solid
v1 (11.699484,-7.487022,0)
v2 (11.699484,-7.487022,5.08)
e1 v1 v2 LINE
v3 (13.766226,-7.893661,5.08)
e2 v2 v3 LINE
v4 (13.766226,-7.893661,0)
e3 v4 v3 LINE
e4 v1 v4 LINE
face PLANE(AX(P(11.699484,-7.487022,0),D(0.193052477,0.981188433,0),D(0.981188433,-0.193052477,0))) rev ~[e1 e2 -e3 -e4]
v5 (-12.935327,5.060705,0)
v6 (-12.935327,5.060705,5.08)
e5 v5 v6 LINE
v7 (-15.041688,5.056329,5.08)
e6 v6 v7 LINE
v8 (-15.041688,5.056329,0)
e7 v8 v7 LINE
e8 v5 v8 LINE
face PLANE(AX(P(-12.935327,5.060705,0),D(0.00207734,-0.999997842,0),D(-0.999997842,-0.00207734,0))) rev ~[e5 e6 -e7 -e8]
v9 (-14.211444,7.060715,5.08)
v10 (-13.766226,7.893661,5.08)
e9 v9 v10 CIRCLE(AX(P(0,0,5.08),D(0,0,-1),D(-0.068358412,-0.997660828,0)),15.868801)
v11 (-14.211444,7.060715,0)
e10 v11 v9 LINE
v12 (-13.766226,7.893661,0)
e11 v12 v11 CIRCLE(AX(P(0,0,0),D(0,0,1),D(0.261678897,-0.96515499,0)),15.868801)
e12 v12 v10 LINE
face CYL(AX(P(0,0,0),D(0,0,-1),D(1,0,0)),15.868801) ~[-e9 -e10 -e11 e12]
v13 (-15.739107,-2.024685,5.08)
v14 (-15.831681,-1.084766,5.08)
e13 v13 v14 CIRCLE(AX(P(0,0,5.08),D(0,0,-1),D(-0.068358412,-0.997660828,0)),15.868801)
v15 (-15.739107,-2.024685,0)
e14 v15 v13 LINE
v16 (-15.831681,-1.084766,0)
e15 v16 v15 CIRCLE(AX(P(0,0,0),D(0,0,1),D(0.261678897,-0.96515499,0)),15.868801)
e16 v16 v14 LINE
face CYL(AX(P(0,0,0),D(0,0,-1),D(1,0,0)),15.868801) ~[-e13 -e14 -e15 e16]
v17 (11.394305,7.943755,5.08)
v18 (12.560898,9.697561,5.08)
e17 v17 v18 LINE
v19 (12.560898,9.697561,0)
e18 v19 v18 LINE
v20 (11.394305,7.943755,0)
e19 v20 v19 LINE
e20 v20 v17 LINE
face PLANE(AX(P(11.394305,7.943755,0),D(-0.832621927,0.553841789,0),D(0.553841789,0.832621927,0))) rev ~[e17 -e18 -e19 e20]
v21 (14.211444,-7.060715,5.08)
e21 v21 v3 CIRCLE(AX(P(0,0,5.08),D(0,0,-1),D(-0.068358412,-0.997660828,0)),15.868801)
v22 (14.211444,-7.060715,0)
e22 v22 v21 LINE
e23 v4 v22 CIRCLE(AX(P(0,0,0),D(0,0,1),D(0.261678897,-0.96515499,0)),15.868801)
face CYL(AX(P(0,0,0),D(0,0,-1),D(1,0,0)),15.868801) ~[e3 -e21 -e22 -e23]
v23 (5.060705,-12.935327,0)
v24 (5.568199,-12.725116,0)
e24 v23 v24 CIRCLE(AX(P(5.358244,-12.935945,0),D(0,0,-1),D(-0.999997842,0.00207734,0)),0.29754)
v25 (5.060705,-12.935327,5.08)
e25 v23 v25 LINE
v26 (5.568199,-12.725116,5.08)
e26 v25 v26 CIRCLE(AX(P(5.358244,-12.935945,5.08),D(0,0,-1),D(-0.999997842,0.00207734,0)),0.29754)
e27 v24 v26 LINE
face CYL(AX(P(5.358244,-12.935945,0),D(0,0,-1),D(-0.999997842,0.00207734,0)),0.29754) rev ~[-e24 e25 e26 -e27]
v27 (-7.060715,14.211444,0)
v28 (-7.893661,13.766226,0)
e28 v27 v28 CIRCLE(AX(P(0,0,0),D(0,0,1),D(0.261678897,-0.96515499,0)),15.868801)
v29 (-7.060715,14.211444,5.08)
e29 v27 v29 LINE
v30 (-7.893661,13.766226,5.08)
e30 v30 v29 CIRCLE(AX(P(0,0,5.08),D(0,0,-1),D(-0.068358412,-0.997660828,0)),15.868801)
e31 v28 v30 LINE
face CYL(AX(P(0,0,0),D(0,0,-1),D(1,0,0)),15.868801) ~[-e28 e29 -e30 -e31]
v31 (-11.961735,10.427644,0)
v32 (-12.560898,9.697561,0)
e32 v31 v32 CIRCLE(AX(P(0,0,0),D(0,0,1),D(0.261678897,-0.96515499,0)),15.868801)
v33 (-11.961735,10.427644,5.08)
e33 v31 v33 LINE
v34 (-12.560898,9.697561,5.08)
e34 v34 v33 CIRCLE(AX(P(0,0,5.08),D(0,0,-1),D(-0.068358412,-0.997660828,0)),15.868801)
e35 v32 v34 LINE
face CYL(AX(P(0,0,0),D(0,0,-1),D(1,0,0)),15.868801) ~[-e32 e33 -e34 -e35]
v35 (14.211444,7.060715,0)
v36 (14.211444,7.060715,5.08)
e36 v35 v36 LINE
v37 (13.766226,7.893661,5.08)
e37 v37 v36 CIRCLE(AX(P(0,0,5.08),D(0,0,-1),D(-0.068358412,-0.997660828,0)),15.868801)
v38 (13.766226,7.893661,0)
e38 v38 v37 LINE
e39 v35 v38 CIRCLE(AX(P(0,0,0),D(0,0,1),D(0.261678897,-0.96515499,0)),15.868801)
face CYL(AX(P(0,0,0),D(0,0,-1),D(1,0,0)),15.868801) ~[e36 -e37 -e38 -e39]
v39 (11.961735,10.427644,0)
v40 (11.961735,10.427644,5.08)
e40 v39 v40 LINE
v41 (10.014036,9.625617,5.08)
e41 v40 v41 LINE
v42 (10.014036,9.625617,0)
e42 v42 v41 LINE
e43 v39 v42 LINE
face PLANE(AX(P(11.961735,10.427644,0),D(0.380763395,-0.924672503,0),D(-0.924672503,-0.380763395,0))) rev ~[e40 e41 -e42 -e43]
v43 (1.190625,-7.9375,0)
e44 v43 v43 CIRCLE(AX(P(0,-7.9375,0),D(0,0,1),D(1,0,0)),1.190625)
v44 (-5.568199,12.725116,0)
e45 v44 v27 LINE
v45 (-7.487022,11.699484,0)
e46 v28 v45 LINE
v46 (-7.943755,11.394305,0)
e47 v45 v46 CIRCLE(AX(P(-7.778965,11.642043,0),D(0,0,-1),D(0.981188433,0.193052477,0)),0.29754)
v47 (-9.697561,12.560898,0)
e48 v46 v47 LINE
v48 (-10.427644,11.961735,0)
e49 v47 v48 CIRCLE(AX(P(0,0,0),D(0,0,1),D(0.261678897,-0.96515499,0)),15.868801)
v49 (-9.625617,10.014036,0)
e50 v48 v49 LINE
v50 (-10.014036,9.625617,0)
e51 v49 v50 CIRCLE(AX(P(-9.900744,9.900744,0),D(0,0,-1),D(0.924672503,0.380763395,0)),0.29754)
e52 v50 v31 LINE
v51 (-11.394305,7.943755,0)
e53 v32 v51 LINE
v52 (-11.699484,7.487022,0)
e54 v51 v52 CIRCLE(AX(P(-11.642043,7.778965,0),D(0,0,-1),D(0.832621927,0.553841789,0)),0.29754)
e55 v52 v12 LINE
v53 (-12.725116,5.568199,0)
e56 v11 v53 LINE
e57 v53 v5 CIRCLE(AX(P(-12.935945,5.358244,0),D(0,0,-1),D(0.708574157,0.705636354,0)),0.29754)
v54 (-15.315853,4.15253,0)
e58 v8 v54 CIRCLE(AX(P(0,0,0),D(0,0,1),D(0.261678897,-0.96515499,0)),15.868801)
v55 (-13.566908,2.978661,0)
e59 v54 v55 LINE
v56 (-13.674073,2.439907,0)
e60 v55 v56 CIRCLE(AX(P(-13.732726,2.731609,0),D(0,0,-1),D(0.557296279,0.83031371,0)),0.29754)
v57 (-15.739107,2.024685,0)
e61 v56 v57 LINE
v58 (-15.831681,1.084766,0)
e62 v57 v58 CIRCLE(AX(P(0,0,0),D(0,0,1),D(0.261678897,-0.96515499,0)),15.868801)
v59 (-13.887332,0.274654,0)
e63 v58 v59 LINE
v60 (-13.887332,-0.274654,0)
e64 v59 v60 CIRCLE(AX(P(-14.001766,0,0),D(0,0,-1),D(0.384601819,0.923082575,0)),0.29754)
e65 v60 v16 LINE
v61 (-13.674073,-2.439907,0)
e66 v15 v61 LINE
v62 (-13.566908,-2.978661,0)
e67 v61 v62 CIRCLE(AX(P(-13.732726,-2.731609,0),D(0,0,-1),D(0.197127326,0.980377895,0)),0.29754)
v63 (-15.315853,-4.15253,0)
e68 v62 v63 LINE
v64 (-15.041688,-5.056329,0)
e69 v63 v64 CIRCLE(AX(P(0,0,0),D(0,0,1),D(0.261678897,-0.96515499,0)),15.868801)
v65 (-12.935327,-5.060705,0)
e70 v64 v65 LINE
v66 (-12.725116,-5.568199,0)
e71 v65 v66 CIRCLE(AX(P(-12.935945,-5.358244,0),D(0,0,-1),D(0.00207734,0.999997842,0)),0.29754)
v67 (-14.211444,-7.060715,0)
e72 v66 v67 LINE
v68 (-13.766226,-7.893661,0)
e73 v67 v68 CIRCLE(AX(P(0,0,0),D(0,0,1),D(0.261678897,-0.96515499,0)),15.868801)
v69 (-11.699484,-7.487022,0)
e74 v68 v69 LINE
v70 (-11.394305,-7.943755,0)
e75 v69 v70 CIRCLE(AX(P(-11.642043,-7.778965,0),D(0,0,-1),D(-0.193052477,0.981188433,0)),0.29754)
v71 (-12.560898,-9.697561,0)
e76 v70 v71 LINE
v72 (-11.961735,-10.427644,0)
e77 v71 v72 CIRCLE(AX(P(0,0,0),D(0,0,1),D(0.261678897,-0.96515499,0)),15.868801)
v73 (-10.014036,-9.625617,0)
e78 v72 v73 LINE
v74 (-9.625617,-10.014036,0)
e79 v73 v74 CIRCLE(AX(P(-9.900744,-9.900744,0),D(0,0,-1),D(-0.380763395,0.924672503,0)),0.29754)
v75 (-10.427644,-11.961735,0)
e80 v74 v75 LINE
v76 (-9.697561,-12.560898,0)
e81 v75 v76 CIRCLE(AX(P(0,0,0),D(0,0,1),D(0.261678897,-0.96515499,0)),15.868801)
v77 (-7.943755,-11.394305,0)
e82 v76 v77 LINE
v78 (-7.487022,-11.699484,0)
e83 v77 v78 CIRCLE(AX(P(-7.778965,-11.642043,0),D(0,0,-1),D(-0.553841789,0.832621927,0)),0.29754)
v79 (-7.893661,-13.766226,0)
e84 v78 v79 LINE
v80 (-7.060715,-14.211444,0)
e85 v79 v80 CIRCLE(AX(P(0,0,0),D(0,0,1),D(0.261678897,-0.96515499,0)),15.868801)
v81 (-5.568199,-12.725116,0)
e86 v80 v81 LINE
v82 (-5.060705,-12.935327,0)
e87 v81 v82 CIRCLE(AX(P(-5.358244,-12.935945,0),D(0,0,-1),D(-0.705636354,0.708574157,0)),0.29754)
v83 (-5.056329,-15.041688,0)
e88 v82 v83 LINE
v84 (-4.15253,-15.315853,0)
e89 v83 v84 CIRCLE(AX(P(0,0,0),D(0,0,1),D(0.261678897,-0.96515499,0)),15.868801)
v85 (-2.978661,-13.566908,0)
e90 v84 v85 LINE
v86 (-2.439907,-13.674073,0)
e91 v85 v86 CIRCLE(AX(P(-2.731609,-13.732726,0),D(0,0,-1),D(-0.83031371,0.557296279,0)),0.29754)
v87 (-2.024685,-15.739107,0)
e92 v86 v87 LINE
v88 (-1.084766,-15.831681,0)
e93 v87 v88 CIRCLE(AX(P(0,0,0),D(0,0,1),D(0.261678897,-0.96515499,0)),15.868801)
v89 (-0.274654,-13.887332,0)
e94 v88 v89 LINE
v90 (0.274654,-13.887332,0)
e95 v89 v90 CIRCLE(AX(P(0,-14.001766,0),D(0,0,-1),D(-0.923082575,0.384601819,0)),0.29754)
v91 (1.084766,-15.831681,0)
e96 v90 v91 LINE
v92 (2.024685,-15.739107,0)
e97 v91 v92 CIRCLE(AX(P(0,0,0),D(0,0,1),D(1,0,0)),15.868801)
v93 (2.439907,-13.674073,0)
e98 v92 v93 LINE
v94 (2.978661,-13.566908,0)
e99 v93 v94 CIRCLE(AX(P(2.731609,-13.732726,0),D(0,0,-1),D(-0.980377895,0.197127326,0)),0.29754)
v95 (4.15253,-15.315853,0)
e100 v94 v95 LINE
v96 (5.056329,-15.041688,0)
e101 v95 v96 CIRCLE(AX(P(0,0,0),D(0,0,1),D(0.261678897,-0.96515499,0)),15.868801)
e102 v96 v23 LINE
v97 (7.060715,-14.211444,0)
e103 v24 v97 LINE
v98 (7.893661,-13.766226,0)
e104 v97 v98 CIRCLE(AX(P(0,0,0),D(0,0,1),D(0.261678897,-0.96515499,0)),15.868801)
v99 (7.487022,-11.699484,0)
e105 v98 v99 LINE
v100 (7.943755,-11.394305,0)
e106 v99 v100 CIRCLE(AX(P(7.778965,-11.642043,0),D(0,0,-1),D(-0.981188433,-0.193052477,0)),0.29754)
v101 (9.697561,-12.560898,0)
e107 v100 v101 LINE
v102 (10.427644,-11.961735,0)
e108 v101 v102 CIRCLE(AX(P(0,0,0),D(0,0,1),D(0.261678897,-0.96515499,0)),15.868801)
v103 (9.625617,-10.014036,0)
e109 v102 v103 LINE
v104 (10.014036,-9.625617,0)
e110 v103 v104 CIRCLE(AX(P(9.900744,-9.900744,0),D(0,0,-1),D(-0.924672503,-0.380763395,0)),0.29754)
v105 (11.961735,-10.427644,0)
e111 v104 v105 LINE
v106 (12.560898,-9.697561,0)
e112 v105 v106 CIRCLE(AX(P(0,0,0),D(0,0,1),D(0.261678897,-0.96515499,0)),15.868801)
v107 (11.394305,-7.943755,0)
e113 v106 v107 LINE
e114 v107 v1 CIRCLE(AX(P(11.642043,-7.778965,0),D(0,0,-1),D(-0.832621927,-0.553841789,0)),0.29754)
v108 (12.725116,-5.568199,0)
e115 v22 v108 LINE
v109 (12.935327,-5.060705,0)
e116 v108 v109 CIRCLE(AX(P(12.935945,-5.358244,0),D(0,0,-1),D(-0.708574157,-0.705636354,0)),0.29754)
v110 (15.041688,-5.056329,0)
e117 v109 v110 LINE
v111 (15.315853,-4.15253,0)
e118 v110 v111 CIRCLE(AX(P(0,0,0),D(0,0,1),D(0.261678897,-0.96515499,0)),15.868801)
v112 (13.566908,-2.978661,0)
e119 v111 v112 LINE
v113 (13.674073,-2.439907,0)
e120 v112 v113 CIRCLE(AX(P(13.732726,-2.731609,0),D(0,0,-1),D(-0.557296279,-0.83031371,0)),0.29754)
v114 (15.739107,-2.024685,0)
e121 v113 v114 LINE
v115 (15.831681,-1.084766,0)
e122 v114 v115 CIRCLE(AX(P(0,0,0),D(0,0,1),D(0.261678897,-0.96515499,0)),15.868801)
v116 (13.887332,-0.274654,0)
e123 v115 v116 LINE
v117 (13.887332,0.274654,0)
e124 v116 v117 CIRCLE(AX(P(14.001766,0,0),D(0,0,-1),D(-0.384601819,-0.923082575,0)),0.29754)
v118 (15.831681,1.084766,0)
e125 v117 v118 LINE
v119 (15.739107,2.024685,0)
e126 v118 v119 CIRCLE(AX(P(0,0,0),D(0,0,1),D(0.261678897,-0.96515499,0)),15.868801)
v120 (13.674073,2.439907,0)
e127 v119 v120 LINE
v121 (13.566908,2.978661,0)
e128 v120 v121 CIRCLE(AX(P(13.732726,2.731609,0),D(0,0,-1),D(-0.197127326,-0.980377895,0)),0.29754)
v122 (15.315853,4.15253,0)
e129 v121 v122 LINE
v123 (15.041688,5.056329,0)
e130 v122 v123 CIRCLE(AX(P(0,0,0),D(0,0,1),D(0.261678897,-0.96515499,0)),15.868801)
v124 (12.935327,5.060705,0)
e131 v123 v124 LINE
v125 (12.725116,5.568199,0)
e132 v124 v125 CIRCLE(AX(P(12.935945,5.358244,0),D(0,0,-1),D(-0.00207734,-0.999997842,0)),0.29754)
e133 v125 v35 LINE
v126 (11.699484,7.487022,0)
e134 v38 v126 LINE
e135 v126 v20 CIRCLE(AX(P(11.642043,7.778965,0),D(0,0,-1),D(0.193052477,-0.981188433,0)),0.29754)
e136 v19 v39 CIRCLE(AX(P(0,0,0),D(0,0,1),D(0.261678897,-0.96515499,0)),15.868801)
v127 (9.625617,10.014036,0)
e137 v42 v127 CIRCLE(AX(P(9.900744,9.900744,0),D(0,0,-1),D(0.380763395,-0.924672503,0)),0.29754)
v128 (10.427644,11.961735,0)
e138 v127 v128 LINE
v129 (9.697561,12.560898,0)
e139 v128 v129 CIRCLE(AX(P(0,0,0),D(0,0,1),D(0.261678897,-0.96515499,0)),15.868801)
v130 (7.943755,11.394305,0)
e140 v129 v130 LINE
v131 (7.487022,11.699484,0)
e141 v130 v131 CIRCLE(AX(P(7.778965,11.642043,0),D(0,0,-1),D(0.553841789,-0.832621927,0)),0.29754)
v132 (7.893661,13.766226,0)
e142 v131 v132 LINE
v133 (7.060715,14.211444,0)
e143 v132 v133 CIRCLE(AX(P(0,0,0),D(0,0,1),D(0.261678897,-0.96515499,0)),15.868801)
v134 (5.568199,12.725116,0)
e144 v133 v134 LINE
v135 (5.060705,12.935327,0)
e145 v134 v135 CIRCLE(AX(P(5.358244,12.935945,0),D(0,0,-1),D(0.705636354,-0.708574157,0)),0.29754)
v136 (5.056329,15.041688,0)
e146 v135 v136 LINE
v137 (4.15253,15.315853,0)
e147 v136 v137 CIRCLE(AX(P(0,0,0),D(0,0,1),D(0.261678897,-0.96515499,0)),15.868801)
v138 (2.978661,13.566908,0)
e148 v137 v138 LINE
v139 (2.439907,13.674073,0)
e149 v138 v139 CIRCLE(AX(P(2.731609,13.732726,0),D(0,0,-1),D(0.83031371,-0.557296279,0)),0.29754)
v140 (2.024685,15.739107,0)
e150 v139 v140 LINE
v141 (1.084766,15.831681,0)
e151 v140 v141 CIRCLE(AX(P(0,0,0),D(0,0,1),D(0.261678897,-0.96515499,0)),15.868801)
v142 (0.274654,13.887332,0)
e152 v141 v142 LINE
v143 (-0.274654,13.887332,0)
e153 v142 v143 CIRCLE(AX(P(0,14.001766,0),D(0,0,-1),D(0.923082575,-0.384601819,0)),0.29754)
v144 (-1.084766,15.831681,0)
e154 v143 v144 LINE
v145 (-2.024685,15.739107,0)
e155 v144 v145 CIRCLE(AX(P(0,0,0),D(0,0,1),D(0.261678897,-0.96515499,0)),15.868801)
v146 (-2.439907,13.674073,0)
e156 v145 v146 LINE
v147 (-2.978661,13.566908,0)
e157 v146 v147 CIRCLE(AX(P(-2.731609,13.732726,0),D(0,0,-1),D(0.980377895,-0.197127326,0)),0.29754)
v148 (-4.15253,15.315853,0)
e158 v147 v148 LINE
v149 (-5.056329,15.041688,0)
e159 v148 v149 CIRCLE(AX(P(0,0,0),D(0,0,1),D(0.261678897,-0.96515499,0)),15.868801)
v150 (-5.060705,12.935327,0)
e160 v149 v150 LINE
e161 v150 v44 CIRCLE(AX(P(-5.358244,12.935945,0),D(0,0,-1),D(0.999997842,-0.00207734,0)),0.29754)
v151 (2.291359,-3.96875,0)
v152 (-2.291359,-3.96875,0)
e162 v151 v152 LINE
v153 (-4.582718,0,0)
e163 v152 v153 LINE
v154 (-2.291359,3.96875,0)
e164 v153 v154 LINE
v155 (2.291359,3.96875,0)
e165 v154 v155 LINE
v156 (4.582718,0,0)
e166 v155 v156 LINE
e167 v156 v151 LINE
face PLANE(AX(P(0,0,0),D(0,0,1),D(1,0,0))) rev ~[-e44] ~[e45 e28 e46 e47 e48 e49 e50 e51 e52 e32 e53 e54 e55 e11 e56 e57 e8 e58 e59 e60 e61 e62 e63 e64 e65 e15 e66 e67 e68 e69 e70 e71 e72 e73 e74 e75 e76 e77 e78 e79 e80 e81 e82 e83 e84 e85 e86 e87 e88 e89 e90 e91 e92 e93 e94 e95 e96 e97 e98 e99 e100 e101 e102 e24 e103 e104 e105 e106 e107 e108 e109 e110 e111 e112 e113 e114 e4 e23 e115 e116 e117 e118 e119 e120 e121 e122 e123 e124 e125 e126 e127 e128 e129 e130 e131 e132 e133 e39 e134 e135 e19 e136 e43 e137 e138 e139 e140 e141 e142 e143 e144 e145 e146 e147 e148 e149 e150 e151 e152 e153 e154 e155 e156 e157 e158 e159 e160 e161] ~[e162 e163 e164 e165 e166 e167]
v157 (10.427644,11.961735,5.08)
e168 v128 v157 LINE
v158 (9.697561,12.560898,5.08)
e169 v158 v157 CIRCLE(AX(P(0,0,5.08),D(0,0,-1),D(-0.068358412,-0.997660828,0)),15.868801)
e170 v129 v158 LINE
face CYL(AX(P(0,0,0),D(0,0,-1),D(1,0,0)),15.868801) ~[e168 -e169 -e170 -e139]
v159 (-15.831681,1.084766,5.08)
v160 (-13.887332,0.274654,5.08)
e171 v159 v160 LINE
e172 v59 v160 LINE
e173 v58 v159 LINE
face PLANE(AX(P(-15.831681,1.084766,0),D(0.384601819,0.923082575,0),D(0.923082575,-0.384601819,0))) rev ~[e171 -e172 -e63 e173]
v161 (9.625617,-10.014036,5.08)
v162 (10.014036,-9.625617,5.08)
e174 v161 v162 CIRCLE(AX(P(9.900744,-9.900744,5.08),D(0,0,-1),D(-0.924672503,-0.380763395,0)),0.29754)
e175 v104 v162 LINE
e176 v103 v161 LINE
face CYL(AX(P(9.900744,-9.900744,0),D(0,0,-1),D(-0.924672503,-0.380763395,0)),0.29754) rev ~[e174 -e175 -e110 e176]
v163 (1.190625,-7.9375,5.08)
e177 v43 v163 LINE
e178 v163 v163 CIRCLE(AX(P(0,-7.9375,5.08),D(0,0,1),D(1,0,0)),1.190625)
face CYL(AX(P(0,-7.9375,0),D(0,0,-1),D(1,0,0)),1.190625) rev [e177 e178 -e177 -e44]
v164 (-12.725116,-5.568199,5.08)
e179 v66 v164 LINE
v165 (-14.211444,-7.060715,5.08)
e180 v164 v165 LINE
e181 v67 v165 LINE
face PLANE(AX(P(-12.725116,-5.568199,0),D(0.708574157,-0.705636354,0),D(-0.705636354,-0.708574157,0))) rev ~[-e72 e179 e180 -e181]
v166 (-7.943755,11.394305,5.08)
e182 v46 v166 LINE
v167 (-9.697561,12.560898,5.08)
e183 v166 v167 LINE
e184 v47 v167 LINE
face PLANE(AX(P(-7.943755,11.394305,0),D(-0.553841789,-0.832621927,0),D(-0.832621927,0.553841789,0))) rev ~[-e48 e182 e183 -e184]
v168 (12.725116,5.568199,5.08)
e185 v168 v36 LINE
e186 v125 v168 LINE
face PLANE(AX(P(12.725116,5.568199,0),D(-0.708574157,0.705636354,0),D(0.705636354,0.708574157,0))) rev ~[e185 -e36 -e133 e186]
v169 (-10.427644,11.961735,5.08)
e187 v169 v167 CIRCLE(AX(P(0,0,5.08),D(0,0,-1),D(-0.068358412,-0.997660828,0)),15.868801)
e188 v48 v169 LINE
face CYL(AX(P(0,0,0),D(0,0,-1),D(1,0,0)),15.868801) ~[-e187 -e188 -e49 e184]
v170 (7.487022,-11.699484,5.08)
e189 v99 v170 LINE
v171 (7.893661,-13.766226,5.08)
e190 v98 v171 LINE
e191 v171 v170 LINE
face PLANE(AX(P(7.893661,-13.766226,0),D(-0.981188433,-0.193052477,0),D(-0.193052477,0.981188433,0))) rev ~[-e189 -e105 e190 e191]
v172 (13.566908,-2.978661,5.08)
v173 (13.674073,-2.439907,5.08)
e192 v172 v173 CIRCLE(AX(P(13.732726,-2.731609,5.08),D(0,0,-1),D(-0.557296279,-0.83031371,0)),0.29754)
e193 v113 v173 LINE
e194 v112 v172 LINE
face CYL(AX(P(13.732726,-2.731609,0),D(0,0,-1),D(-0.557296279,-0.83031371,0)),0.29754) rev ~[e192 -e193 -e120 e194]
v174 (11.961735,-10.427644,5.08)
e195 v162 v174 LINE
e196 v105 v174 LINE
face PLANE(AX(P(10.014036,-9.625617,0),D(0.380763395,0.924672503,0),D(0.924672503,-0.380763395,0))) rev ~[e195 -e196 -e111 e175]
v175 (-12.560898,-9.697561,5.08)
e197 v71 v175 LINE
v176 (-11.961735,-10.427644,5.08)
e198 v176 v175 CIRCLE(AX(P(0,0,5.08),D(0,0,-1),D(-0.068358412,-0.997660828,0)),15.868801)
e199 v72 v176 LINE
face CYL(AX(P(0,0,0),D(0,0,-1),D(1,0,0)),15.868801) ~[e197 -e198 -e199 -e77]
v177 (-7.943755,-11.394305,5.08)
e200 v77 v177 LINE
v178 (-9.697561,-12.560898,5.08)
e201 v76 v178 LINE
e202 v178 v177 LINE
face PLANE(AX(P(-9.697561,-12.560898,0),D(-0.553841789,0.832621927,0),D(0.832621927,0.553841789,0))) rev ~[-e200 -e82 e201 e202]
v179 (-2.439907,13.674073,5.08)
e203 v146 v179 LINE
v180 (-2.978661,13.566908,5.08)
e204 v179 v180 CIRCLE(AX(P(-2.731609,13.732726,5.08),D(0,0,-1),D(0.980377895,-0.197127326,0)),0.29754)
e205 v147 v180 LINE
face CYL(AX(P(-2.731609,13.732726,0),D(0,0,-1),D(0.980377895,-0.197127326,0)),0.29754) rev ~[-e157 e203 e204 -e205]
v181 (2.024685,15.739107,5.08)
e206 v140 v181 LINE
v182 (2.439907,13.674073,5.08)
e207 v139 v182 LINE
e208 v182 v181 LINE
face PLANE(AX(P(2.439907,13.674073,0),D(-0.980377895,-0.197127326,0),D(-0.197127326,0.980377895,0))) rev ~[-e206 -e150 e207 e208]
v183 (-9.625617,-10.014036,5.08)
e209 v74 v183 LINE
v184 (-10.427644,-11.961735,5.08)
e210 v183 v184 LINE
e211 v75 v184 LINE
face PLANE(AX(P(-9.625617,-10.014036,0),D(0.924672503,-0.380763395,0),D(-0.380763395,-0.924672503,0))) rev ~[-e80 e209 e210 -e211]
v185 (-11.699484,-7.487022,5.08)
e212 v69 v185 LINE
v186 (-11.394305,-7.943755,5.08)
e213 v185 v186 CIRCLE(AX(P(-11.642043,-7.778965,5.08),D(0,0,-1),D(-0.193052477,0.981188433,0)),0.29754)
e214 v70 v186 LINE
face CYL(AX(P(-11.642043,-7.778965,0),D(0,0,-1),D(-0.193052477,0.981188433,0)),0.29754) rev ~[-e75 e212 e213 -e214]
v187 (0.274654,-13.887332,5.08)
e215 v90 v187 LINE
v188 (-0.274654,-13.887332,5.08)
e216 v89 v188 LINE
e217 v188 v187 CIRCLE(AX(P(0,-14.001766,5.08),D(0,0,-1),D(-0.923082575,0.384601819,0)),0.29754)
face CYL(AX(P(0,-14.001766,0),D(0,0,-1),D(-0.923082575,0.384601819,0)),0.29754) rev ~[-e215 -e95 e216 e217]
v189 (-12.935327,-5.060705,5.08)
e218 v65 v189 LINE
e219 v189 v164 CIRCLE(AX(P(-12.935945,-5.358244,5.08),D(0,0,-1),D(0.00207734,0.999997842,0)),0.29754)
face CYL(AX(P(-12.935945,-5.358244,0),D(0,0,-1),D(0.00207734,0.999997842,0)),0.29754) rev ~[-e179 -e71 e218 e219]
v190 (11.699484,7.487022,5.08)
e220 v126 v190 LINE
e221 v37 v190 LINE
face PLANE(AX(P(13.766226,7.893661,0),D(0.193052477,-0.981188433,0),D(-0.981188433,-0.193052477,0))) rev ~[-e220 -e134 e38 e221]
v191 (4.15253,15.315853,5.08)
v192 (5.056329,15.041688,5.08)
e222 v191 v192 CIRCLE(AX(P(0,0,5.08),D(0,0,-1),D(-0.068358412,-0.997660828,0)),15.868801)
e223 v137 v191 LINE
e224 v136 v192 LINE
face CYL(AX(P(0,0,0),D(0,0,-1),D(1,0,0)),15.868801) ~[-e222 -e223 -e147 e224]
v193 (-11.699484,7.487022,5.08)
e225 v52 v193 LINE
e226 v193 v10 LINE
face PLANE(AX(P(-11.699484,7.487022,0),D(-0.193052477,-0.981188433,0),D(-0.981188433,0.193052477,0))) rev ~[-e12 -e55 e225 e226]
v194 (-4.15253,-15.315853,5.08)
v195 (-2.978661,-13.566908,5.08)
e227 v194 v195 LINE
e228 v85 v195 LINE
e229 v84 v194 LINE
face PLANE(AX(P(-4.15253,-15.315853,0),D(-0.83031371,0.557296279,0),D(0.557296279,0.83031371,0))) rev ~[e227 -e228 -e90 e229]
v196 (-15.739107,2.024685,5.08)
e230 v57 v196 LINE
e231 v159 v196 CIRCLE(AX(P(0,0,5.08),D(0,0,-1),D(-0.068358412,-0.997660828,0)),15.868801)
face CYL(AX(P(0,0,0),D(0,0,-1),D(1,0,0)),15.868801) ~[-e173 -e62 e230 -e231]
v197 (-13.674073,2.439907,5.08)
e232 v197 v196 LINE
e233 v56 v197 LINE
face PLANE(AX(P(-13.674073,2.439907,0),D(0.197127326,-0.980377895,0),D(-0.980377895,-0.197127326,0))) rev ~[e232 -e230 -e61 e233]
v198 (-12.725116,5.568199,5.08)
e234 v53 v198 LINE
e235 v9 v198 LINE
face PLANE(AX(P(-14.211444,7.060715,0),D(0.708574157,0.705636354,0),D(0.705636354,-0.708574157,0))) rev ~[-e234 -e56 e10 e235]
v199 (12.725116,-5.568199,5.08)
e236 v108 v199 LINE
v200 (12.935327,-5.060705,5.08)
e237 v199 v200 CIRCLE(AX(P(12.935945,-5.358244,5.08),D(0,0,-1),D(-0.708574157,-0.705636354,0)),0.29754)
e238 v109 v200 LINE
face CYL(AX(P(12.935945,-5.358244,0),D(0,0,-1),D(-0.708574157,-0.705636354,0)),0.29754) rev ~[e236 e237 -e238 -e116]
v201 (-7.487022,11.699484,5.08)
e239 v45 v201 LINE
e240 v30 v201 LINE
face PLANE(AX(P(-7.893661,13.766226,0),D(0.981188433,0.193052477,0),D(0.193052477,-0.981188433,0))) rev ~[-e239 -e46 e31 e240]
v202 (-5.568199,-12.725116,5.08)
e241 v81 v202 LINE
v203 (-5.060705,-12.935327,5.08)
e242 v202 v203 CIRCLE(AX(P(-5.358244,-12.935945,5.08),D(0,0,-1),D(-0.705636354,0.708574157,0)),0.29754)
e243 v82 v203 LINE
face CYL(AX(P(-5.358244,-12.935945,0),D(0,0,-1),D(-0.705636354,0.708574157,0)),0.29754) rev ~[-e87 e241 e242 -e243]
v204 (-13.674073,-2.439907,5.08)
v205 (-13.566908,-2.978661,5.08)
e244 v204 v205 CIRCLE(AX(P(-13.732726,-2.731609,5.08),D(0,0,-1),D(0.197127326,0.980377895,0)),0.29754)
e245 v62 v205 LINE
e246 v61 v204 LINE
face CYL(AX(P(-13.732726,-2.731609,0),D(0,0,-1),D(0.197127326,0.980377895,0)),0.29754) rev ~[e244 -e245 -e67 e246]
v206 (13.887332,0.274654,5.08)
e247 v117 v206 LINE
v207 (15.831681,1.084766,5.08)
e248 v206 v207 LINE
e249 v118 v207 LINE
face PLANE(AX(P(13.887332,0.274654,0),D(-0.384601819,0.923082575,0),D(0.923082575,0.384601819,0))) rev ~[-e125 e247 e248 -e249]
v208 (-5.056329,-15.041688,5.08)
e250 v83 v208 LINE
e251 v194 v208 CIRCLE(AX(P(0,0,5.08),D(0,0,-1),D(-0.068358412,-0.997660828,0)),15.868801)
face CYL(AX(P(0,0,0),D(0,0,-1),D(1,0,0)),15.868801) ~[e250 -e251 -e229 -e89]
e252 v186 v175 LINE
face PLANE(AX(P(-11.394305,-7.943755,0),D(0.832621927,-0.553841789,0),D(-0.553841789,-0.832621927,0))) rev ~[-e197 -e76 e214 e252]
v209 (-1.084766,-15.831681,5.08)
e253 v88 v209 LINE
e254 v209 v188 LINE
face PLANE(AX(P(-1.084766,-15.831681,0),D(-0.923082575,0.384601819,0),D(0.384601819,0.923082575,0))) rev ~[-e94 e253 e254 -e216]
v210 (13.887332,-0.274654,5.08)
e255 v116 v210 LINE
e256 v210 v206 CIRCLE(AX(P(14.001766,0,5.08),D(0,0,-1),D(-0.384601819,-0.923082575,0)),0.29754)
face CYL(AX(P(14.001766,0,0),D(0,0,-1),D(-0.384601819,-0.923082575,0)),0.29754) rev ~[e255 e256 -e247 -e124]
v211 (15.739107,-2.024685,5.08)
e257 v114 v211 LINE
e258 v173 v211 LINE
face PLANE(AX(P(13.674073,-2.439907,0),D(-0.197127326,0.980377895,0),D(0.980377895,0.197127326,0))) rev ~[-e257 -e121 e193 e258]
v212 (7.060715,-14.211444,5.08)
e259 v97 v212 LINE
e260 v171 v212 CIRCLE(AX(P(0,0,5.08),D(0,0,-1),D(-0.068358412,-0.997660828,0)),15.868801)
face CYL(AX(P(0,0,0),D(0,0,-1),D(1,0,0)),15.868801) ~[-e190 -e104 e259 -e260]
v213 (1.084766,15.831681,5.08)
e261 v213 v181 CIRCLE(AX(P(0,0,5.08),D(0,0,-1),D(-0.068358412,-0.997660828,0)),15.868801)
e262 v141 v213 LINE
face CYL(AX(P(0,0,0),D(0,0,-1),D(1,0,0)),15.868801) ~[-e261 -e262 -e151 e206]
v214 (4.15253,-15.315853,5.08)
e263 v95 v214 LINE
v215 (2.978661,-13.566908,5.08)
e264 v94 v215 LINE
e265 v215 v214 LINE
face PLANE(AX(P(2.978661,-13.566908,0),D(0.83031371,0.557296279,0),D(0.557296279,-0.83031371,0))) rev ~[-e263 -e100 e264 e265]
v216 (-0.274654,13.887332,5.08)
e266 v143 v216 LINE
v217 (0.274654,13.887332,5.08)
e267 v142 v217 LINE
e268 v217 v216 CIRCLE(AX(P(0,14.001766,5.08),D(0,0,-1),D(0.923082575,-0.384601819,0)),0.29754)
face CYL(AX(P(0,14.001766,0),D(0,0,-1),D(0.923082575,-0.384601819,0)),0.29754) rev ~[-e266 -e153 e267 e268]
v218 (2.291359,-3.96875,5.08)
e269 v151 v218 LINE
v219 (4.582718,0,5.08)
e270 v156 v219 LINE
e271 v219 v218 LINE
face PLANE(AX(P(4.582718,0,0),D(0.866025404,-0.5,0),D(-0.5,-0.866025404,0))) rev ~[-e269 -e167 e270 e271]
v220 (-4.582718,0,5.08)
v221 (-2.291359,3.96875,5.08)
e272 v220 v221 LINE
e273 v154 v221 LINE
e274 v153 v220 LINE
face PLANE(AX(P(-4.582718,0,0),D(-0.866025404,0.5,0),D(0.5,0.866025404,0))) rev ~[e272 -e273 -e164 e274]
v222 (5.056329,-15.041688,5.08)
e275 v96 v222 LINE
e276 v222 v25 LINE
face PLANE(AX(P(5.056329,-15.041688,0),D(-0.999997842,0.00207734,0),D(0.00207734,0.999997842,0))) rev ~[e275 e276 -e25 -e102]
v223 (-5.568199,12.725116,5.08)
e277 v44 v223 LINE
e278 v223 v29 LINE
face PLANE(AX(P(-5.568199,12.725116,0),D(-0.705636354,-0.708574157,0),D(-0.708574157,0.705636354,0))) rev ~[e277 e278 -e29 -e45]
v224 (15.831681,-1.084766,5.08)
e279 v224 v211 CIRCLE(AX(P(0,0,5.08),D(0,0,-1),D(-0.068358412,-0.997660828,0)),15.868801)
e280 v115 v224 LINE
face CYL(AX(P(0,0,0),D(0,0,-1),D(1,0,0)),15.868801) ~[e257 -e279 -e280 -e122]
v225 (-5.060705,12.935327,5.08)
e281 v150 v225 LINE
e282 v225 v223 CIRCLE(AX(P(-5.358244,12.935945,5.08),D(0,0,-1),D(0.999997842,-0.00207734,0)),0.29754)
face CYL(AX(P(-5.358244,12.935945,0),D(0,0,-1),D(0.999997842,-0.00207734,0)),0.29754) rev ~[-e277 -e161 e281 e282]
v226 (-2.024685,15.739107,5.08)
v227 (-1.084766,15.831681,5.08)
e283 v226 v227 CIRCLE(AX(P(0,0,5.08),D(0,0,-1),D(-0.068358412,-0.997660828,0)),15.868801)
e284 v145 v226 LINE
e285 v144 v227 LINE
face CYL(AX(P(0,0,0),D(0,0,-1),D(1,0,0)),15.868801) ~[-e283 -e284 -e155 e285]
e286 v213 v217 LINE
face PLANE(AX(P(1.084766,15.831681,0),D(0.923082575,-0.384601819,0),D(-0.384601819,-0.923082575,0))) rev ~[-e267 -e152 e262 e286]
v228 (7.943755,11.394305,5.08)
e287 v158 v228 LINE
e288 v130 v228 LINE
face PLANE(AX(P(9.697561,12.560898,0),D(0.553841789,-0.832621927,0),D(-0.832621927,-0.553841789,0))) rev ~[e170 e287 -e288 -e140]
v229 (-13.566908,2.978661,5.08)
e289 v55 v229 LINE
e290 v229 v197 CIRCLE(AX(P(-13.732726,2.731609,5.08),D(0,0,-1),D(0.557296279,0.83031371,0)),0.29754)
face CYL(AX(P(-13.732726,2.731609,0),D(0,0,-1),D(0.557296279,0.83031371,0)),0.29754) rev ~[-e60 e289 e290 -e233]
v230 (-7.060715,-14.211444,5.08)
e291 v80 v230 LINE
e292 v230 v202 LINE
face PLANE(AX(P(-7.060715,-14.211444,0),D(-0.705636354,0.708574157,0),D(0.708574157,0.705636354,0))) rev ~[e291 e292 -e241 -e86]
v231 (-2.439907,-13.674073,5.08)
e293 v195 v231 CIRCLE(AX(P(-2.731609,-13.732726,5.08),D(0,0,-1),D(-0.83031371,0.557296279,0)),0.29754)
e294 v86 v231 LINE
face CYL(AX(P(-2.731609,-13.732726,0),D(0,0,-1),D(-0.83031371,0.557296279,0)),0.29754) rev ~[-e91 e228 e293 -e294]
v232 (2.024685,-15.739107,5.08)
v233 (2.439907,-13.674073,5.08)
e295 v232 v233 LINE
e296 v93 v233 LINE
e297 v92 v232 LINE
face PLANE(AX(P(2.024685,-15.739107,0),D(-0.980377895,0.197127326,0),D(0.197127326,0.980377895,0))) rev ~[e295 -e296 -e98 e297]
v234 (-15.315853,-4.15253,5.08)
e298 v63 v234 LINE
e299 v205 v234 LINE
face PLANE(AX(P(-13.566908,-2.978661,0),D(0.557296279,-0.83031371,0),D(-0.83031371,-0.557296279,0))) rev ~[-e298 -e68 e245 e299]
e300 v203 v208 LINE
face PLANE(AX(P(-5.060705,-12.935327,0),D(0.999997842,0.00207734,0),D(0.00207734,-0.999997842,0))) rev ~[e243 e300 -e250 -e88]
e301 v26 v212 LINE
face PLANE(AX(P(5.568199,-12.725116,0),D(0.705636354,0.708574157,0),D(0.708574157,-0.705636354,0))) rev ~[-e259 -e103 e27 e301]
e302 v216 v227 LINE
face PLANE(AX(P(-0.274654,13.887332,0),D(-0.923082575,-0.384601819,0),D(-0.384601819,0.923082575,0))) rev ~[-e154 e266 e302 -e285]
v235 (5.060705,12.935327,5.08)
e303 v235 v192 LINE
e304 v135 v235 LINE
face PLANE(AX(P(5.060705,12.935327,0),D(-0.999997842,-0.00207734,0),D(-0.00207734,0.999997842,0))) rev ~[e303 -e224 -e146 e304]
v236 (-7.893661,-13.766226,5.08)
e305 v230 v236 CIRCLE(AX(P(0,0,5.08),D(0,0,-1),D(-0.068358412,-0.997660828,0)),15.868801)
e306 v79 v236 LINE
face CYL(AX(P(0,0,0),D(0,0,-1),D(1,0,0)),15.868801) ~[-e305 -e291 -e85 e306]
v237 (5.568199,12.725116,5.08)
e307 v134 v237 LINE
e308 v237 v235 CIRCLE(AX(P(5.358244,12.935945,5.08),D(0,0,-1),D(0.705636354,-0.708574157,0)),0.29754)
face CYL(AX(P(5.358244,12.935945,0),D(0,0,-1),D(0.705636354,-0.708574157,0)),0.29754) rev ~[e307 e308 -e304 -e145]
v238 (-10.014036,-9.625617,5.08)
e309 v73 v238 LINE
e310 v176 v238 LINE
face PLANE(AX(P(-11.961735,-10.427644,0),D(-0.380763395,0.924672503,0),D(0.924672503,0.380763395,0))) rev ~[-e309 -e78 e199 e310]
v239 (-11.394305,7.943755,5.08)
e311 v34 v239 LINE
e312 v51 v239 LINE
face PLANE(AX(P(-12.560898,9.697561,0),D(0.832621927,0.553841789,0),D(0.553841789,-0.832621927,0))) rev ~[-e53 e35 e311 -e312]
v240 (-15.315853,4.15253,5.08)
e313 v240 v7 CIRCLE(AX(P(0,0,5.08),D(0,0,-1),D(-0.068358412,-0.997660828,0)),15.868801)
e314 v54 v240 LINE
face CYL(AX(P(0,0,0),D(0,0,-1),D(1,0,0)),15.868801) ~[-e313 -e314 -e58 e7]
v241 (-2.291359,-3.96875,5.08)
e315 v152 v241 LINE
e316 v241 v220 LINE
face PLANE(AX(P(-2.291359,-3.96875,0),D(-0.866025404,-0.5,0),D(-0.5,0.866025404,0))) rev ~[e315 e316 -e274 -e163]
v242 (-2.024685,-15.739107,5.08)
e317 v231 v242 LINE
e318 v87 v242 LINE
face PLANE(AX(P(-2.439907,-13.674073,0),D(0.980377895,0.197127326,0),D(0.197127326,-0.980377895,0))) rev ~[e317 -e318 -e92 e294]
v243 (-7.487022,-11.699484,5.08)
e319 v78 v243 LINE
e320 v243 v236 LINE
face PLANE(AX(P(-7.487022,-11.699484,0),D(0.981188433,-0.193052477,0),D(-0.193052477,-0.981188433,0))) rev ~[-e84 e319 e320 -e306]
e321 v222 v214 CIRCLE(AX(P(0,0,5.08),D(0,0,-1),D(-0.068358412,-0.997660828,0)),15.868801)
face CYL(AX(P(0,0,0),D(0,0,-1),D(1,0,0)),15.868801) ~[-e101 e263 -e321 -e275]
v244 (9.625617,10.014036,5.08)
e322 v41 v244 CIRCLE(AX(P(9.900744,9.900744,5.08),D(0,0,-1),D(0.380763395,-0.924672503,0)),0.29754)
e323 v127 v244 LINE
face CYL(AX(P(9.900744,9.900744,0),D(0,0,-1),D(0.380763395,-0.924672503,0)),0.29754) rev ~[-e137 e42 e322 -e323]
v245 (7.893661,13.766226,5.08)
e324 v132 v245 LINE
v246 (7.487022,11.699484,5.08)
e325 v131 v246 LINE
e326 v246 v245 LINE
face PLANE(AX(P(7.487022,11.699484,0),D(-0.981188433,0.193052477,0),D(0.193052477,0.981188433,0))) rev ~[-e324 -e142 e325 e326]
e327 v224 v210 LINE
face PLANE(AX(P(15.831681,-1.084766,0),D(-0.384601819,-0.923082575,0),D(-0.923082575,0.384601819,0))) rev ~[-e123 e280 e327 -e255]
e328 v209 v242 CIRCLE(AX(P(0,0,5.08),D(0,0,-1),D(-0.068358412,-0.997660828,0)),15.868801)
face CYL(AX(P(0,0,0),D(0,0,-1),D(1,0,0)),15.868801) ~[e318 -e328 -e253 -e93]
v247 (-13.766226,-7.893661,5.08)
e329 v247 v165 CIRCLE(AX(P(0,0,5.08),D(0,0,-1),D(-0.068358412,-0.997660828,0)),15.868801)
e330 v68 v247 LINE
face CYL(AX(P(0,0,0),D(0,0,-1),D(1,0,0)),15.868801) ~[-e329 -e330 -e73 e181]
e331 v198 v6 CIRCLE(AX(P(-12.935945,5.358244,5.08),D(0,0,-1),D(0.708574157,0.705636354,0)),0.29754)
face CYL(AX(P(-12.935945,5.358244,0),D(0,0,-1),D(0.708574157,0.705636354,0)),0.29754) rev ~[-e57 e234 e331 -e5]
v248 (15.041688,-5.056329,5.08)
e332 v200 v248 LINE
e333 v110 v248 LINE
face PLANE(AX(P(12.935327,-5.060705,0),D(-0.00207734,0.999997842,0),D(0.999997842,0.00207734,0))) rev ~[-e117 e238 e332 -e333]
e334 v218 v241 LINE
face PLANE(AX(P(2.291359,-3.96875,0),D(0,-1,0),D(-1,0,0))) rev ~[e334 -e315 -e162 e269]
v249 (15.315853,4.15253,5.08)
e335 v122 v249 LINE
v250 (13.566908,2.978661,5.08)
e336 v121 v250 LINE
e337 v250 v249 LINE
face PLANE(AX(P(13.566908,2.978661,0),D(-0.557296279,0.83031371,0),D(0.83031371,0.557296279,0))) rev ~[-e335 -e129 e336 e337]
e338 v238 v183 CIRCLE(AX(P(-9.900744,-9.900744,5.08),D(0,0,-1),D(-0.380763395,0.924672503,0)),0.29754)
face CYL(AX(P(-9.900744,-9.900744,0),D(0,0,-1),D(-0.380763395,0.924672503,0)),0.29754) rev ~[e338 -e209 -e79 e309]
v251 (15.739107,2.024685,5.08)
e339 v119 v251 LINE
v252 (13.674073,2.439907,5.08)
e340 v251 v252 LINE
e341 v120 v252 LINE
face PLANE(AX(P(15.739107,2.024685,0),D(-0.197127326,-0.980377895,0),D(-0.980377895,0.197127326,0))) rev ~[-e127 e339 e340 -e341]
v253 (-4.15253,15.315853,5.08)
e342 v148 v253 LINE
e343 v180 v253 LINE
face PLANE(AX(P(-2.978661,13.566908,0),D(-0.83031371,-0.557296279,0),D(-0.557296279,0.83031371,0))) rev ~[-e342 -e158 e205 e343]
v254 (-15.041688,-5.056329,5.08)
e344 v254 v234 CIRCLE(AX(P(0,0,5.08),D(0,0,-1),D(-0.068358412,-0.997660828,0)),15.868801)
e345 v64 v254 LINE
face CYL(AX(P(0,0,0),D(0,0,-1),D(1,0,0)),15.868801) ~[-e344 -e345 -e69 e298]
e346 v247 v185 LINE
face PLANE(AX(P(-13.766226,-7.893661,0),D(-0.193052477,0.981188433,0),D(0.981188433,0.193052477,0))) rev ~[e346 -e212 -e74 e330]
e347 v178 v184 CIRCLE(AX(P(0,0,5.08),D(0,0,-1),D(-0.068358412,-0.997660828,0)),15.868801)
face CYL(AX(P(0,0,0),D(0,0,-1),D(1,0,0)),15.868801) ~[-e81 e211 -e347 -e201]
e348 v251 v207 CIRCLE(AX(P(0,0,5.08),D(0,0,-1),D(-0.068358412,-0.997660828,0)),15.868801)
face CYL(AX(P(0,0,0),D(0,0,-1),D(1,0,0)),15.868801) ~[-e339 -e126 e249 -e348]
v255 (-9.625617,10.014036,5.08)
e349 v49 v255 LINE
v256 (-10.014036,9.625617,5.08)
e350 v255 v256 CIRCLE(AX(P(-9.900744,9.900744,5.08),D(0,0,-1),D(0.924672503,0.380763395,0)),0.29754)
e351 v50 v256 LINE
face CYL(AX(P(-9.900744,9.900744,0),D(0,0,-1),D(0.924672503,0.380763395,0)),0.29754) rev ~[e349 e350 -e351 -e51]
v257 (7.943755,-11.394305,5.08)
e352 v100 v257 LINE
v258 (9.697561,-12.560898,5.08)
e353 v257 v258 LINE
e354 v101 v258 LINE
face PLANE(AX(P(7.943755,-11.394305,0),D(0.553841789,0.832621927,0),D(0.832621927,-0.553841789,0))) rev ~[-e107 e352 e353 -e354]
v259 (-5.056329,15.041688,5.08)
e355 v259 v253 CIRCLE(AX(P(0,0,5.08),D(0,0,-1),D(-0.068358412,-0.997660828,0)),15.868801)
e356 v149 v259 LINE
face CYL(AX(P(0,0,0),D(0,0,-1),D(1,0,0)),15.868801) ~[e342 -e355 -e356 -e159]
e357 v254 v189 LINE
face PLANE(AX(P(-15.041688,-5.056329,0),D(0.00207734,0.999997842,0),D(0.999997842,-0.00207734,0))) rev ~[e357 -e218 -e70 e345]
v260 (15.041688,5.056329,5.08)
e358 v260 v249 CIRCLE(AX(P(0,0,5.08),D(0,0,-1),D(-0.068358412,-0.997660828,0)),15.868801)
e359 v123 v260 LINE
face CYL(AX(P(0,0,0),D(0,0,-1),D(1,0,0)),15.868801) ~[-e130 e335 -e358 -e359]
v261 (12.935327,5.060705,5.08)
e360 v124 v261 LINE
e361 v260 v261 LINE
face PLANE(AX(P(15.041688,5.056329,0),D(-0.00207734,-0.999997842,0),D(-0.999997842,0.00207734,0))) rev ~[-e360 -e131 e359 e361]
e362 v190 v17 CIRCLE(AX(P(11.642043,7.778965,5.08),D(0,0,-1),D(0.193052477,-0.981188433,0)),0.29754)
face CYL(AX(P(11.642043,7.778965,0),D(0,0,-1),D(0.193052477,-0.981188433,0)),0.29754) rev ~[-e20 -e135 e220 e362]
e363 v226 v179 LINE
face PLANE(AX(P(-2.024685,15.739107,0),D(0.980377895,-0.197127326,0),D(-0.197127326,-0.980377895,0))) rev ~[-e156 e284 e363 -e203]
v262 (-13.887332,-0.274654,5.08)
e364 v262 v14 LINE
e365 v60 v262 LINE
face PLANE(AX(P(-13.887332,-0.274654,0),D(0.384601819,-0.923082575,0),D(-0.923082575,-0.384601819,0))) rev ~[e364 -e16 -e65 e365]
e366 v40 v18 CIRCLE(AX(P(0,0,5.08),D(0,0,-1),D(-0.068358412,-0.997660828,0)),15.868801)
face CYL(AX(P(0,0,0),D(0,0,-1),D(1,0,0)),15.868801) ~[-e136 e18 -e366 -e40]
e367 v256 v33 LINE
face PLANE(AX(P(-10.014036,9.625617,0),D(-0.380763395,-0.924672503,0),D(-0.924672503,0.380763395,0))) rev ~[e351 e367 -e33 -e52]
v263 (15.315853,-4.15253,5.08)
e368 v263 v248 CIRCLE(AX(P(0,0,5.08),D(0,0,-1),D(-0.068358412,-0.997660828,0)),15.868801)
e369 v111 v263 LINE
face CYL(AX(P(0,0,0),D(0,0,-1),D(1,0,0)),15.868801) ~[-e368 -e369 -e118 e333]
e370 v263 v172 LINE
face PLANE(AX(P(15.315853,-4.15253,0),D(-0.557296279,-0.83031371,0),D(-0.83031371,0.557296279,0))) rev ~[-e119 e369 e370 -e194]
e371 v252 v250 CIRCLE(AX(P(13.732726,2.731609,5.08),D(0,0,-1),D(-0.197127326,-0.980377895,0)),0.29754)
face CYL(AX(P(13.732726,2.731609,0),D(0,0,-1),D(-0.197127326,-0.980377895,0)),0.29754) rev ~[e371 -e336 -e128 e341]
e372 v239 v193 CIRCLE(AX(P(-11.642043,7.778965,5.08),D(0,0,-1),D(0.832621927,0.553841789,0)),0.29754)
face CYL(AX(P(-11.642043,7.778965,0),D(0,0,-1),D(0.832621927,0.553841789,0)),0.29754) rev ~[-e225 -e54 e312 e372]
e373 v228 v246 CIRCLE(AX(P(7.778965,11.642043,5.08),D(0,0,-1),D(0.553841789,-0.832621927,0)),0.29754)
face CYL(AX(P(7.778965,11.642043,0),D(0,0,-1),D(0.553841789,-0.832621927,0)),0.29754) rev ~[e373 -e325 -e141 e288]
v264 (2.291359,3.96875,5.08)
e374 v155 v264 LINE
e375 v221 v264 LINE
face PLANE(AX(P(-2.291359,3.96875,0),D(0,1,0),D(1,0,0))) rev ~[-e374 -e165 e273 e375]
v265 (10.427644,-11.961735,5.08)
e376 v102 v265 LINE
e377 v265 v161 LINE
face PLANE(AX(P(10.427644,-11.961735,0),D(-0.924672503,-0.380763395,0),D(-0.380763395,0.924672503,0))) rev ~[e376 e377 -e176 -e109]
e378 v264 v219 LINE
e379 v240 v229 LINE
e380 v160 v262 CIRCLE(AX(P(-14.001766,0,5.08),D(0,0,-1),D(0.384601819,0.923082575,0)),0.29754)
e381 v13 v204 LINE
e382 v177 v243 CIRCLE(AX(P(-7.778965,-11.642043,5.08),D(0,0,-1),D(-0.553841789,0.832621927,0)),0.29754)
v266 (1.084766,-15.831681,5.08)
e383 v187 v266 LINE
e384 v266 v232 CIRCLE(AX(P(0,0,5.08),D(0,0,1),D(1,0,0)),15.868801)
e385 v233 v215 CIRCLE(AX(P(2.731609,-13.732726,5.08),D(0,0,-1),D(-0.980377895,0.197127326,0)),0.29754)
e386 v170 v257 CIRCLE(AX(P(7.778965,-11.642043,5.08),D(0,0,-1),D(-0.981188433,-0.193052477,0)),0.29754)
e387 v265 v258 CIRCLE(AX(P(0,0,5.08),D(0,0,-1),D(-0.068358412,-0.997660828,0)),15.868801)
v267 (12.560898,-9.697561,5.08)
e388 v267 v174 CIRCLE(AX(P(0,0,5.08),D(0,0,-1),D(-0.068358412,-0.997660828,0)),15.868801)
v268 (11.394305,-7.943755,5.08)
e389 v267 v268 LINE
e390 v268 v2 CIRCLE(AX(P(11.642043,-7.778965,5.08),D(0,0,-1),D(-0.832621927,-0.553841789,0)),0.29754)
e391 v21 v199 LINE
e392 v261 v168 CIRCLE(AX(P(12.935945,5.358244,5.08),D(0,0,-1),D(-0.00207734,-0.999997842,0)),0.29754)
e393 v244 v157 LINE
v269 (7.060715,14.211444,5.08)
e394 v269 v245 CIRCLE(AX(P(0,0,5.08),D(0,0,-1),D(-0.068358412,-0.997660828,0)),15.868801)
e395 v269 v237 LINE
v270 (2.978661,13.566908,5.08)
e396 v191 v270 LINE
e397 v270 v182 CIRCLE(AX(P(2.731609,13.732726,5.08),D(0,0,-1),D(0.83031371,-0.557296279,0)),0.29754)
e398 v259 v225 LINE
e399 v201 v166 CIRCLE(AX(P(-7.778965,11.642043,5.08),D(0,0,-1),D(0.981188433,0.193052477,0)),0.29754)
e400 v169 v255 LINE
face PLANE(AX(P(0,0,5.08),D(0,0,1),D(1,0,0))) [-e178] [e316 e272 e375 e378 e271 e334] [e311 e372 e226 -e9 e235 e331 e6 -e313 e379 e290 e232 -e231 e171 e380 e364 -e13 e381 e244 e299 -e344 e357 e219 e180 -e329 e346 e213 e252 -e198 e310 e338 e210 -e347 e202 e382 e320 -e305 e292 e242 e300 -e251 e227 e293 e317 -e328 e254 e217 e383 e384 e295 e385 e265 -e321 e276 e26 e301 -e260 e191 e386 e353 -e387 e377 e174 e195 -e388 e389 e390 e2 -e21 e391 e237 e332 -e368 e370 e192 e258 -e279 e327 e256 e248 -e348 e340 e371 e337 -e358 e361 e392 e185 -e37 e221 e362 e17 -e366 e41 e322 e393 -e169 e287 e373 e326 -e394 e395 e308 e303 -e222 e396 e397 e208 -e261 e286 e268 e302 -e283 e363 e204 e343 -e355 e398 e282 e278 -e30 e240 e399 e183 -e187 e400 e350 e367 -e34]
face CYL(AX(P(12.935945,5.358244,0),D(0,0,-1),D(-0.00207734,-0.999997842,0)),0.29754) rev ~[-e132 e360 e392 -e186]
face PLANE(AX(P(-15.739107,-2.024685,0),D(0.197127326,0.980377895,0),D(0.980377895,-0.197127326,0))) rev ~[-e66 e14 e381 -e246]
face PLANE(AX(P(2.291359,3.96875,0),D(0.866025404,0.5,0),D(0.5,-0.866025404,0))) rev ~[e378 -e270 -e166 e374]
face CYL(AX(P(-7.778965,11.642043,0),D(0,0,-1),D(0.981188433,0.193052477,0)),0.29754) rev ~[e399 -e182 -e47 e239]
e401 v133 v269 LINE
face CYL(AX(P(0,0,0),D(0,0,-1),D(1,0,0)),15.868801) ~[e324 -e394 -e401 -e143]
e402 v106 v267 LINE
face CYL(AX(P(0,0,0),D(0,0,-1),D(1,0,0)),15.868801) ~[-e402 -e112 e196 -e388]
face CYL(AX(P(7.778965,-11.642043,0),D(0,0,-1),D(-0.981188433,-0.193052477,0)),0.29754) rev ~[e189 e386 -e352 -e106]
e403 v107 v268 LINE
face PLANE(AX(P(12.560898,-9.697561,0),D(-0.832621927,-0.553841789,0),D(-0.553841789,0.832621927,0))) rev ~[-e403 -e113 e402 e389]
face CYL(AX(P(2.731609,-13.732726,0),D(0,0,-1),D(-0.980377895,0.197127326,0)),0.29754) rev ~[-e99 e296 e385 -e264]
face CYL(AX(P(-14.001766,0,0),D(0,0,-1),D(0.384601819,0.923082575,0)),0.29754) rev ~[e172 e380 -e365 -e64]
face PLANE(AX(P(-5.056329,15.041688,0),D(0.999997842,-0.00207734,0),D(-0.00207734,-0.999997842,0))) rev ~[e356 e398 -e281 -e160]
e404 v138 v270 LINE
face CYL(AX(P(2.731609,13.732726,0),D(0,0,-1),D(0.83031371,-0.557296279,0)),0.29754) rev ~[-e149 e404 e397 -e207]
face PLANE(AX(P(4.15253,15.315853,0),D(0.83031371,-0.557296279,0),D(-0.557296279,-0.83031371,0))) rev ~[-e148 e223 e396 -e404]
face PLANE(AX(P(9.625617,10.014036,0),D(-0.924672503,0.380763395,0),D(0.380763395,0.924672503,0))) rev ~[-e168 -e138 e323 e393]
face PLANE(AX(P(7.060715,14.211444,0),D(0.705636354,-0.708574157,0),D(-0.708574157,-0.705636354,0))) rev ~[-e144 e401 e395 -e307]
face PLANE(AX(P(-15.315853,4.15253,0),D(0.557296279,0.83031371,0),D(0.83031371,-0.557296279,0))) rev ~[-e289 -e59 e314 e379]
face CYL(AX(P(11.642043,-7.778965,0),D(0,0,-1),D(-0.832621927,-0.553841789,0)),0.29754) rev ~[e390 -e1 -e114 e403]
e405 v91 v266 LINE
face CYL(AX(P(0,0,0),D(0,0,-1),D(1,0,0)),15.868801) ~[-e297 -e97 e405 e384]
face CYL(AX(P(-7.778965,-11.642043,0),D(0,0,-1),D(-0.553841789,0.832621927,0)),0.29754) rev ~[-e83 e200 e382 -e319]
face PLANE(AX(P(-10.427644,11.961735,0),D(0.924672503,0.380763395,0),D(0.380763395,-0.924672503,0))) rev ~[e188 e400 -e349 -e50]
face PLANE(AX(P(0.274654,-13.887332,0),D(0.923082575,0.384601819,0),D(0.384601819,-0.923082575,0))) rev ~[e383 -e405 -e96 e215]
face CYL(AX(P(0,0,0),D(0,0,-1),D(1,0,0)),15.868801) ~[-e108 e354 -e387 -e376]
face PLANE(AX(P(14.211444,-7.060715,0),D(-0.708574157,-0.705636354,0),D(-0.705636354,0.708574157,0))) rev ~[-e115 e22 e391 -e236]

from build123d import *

# Parameters (mm, degrees)
F0_R            = 15.8688012495
F0_R_2          = 1.190625
F1_DEPTH        = 5.08
F3_DEPTH        = 5.08
F3_COPIES_COUNT = 32


# Not quite as in the source:
# - a pattern or mirror of a feature is missing from the dataset's text; its kind, count and spacing are read off the source's solid


with BuildPart() as f1:
    # F0 (on Top) → F1 (new body)
    with BuildSketch(Plane.XY):
        Circle(F0_R)
        with Locations((0, -7.9375)):
            Circle(F0_R_2, mode=Mode.SUBTRACT)
        Polygon((-4.5827177617, 0), (-2.2913588808, 3.96875), (2.2913588808, 3.96875), (4.5827177617, 0), (2.2913588808, -3.96875), (-2.2913588808, -3.96875), align=None, mode=Mode.SUBTRACT)
    extrude(amount=F1_DEPTH)

    # F2 (on face) → F3 (cut, through all)
    with BuildSketch(Plane(origin=(0, 0, 0), x_dir=(1, 0, 0), z_dir=(0, 0, -1))):
        with BuildLine():
            Line((0.2746540111, 13.8873319852), (1.0847660613, 15.8316813917))
            ThreePointArc((1.0847660613, 15.8316813917), (0, 15.8688012495), (-1.0847660613, 15.8316813917))
            Line((-1.0847660613, 15.8316813917), (-0.2746540111, 13.8873319852))
            ThreePointArc((-0.2746540111, 13.8873319852), (0, 13.7042263959), (0.2746540111, 13.8873319852))
        make_face()
    f3 = extrude(amount=-F3_DEPTH, mode=Mode.SUBTRACT)

    # F3_copies: F3 ×32 about axis
    f3_copies_axis = Axis((0, 0, 0), (0, 0, 1))
    for i in range(1, F3_COPIES_COUNT):
        add(f3.rotate(f3_copies_axis, i * 360 / F3_COPIES_COUNT), mode=Mode.SUBTRACT)


solid = f1.part
